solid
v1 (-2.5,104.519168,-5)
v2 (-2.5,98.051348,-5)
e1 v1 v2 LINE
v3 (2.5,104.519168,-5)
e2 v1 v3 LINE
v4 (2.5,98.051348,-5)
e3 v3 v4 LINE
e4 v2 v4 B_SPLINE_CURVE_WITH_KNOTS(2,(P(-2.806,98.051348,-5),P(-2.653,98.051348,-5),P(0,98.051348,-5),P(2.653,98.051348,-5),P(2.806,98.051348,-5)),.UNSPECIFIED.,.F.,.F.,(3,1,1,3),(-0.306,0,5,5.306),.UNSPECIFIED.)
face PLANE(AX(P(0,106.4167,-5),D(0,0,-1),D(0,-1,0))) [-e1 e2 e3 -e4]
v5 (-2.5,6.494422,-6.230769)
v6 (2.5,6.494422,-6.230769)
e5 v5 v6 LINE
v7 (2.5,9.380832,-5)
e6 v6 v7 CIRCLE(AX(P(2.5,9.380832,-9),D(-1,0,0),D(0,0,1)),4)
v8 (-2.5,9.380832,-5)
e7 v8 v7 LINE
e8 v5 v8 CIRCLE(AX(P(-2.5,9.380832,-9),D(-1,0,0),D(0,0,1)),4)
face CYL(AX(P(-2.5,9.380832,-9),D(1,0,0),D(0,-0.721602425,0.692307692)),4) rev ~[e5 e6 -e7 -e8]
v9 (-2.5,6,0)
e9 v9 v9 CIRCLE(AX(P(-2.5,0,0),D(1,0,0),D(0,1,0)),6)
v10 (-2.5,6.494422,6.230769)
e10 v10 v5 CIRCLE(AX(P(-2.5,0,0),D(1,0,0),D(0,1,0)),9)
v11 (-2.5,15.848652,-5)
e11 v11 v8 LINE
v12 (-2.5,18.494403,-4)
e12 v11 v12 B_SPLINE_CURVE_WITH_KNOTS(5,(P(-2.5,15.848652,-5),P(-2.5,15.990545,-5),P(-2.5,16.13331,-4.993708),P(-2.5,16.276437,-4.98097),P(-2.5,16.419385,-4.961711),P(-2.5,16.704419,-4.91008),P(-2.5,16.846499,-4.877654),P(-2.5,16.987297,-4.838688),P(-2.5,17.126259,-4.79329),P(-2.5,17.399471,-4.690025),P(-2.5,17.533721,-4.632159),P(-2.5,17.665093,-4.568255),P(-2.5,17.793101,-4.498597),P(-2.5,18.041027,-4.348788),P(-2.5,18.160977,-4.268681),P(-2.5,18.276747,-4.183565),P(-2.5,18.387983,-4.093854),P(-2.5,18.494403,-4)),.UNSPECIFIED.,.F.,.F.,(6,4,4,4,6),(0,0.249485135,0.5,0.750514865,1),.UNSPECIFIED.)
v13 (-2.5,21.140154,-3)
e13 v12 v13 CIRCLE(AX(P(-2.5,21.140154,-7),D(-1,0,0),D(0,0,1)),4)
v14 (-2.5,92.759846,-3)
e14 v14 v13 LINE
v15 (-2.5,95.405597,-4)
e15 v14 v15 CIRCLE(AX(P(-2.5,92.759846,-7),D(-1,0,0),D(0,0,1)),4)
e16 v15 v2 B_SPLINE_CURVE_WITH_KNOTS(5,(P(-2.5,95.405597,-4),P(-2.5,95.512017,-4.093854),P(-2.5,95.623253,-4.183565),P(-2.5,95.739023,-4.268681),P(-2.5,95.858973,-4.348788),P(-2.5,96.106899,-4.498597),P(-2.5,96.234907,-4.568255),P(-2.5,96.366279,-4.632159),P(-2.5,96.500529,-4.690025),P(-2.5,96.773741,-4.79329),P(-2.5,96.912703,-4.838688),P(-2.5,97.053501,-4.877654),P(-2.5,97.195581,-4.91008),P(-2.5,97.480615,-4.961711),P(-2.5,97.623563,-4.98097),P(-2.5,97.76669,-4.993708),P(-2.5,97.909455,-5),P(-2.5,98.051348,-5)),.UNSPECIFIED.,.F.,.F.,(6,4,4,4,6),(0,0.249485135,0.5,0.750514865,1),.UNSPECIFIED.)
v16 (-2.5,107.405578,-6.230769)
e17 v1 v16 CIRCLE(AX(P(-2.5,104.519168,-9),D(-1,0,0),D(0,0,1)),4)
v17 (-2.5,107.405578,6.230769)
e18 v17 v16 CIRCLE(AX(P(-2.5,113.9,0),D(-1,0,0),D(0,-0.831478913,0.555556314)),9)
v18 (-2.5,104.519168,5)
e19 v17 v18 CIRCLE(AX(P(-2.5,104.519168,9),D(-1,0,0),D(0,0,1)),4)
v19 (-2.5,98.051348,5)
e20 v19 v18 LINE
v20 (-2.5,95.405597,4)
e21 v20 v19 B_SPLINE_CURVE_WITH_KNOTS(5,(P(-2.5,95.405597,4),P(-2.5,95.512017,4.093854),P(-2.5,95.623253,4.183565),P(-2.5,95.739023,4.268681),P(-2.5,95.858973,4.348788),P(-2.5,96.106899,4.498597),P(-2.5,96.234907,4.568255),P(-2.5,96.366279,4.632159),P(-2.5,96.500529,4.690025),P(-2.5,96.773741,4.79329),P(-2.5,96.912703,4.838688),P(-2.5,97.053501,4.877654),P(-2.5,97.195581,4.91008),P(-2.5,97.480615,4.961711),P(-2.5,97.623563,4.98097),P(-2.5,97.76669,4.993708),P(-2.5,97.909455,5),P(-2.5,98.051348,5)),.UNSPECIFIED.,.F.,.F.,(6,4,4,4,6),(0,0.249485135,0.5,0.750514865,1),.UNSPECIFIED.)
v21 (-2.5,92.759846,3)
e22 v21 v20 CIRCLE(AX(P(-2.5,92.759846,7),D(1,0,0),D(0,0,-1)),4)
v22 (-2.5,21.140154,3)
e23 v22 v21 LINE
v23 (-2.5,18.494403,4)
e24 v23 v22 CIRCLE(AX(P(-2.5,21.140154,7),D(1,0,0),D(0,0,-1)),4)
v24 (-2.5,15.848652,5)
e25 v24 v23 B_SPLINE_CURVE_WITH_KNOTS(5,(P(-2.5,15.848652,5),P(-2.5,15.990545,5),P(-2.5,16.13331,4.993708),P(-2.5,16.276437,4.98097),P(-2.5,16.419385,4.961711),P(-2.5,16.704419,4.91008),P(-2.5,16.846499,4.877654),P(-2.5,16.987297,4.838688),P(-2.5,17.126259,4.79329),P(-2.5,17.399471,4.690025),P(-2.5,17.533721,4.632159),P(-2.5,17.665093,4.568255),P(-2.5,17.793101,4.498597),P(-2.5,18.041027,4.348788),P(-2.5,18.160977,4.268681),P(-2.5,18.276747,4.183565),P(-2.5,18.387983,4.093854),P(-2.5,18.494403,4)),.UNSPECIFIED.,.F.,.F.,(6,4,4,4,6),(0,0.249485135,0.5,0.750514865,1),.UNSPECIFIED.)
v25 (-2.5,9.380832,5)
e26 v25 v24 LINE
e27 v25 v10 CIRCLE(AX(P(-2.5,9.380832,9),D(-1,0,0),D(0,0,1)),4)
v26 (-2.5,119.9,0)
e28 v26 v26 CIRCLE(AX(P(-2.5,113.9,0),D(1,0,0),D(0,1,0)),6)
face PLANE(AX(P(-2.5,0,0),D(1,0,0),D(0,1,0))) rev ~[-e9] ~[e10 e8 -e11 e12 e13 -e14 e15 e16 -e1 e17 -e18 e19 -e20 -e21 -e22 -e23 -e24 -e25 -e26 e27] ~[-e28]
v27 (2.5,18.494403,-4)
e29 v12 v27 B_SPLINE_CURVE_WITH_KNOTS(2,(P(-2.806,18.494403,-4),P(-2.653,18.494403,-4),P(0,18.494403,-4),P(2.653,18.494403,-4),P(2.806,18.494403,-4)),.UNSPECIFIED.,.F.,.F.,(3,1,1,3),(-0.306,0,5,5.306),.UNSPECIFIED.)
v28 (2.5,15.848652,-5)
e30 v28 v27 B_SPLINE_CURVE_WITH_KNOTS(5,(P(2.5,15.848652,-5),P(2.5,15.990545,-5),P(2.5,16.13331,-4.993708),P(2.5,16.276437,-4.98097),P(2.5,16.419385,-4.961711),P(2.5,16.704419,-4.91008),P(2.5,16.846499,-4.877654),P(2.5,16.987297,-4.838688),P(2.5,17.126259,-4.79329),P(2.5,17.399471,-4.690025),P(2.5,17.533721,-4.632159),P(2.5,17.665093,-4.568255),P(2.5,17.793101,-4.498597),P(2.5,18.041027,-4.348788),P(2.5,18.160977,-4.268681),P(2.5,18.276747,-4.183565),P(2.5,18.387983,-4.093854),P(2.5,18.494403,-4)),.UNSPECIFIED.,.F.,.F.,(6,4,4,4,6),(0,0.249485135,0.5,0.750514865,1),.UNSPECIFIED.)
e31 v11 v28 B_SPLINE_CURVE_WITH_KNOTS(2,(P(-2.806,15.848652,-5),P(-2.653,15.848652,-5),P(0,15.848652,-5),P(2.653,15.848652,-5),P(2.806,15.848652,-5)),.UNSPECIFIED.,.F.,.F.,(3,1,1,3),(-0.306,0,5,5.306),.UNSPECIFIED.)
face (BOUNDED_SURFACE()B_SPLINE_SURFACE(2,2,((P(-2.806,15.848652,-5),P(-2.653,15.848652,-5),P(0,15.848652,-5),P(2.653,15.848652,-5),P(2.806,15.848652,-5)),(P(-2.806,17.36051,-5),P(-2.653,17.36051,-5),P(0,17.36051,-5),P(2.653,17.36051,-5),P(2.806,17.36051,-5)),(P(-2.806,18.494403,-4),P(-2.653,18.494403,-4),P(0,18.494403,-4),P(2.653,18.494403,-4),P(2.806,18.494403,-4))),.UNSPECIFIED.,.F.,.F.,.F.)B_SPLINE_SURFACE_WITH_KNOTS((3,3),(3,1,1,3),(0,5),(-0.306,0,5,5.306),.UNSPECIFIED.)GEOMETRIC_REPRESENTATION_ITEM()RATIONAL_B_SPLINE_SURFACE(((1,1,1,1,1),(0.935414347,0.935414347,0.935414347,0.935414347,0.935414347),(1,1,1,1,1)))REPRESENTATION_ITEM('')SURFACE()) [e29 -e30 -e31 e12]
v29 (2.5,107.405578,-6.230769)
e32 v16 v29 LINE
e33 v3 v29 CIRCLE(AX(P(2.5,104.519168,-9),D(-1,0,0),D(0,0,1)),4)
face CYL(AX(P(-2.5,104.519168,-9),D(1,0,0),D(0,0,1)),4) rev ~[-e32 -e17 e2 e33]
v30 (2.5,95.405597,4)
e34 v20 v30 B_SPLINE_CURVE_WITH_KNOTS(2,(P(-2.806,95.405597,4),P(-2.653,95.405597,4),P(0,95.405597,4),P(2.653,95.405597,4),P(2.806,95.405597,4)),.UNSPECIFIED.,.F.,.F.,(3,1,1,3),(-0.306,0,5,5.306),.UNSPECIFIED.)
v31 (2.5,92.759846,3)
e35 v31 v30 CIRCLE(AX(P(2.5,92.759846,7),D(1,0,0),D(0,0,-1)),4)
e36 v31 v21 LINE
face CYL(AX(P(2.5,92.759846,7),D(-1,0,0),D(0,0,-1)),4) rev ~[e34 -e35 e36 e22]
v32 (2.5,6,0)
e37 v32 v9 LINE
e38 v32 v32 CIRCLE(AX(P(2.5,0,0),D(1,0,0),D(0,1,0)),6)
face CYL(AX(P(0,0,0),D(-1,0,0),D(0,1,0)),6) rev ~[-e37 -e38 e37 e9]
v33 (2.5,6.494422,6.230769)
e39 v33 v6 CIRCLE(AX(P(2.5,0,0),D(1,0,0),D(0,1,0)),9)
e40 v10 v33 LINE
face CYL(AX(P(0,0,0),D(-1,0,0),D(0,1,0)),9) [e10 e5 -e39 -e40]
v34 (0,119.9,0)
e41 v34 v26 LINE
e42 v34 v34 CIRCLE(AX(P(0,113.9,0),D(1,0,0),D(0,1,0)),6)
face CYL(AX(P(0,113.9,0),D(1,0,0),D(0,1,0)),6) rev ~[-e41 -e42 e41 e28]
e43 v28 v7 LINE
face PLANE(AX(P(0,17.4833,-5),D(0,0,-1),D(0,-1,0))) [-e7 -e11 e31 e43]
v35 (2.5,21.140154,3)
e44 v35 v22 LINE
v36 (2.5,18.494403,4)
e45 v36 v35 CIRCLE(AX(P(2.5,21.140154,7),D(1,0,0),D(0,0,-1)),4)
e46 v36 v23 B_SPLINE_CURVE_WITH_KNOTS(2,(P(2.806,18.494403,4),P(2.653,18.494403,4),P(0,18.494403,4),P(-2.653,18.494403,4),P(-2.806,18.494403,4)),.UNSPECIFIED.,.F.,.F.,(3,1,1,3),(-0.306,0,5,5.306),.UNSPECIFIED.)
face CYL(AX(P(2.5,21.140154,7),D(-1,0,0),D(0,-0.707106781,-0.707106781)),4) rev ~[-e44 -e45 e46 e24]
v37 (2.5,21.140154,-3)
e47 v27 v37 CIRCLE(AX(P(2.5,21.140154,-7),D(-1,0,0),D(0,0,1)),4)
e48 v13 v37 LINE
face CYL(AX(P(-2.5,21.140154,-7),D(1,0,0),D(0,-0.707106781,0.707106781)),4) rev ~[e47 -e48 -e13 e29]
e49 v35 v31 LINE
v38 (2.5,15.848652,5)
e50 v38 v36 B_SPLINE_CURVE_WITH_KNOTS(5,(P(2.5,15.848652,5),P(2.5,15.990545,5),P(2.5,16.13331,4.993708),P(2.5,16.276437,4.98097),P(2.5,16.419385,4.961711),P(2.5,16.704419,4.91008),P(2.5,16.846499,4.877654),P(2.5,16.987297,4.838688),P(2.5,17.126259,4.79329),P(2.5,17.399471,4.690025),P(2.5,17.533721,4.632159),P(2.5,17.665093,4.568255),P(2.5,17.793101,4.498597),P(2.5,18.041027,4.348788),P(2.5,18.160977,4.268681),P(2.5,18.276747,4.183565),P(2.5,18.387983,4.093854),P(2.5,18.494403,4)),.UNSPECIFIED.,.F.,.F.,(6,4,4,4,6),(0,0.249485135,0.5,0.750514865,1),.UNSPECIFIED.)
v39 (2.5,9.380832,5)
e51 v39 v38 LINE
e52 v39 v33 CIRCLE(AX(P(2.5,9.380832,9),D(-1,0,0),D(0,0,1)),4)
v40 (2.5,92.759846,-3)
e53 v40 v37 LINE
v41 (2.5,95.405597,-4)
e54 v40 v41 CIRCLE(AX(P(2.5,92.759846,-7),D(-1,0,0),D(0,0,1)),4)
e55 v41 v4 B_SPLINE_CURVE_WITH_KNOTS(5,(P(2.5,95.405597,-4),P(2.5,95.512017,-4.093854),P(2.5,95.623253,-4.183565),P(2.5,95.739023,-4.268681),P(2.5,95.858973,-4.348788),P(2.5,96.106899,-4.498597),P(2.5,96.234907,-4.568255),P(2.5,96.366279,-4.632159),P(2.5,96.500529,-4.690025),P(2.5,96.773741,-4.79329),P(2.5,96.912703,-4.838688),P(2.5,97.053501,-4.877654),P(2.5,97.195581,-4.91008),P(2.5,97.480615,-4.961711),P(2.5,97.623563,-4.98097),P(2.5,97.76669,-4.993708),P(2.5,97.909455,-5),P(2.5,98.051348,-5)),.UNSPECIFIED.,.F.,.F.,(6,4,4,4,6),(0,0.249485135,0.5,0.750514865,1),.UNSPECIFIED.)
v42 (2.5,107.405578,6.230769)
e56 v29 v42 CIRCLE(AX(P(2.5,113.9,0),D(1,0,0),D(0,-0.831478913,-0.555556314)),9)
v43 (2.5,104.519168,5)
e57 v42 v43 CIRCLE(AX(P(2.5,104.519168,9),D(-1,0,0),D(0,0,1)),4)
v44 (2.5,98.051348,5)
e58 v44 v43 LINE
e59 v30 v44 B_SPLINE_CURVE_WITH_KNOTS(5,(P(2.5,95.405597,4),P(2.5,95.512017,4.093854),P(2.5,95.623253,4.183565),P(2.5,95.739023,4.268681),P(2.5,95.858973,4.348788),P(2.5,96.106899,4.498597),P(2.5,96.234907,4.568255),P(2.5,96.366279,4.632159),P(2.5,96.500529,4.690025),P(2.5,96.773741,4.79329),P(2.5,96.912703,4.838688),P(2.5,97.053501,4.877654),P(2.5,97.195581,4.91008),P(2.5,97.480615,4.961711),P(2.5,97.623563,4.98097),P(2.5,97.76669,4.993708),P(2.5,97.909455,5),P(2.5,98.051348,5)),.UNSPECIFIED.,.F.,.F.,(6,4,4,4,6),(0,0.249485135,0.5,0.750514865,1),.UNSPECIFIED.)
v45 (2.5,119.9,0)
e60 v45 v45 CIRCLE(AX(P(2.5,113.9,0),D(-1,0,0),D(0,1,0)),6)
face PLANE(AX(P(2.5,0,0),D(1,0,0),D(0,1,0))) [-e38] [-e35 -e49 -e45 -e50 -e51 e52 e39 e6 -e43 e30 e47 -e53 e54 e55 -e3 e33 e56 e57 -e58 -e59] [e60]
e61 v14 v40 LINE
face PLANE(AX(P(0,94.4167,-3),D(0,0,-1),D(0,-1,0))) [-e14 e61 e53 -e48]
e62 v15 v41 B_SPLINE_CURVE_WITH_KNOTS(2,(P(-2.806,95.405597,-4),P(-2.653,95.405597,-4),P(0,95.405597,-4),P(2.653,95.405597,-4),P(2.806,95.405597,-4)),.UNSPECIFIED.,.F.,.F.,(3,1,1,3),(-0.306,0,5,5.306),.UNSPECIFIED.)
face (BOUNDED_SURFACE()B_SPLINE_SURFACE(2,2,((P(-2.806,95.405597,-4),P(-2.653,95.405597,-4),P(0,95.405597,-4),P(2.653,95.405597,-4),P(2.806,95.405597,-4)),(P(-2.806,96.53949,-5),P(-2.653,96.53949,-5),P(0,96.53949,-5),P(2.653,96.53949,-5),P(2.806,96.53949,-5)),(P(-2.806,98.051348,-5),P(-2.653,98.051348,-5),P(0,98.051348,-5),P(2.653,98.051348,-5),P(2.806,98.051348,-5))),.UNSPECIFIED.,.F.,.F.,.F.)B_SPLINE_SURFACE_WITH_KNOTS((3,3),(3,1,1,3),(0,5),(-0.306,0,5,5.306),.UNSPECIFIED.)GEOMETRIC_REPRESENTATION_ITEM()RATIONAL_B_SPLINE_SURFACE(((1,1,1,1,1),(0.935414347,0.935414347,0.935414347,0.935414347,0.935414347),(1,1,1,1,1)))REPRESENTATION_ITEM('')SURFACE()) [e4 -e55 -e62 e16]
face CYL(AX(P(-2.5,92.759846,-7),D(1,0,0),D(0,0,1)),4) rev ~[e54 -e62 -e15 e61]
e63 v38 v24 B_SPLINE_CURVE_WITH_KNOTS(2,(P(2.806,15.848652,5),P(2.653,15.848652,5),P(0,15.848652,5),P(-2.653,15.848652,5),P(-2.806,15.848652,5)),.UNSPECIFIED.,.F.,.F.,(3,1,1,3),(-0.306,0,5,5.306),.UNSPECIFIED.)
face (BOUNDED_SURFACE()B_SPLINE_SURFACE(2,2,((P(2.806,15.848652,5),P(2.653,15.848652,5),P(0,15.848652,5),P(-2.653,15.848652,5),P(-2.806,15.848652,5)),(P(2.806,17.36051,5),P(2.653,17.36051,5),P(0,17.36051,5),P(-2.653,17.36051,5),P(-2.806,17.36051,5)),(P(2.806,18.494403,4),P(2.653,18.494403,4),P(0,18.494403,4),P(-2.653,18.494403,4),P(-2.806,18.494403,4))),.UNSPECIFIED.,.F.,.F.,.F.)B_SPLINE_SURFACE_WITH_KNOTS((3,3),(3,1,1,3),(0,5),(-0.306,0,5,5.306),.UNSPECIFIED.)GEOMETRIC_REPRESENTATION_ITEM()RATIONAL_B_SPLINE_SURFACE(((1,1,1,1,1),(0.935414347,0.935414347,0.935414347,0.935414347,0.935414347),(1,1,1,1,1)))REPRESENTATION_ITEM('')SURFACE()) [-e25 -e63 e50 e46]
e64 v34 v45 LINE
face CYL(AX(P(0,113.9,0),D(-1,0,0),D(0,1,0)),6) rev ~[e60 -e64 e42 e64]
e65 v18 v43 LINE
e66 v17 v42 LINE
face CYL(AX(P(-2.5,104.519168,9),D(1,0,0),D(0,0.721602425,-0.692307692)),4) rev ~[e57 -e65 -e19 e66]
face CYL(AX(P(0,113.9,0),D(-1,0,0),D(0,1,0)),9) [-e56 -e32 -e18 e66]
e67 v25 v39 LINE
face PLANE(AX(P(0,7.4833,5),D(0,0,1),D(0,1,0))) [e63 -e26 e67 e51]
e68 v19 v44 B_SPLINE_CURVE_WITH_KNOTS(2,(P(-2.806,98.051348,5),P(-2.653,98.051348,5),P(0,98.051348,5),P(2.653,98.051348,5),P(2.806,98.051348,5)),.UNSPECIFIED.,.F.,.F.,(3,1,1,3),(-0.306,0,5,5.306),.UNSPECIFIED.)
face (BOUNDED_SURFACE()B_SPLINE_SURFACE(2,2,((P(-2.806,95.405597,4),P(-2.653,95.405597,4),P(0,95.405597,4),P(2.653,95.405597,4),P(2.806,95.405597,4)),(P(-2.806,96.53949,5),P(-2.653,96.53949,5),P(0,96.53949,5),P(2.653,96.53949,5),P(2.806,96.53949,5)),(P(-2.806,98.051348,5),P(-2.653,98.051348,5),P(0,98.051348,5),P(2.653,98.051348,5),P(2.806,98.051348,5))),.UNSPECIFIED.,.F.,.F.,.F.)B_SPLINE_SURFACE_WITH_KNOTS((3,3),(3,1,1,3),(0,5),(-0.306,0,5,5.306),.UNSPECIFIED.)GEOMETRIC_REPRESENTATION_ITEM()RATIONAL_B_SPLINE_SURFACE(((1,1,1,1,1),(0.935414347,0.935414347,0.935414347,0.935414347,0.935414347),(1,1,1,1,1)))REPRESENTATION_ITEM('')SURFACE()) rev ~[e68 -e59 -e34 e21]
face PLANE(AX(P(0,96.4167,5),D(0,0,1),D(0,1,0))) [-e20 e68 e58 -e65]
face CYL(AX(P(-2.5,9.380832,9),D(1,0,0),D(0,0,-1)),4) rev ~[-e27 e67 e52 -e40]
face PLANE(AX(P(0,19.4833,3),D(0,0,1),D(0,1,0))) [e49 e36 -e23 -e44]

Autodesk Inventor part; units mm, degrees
ref_plane "YZ Plane" through (0, 0, 0) normal (1, 0, 0) x (0, 1, 0)
ref_plane "XZ Plane" through (0, 0, 0) normal (0, 1, 0) x (-1, 0, 0)
ref_plane "XY Plane" through (0, 0, 0) normal (0, 0, 1) x (1, 0, 0)
sketch "草圖1" plane through (0, 0, 0) normal (1, 0, 0) x (0, 1, 0)
  line L0 (0, 0) -> (113.9, 0)
  circle A0 centre (113.9, 0) radius 6
  circle A1 centre (0, 0) radius 6
  circle A2 centre (0, 0) radius 9
  circle A3 centre (113.9, 0) radius 9
  line L1 (7.4833, 5) -> (17.4833, 5)
  line L2 (17.4833, 5) -> (19.4833, 3)
  line L3 (19.4833, 3) -> (94.4167, 3)
  line L4 (94.4167, 3) -> (96.4167, 5)
  line L5 (96.4167, 5) -> (106.4167, 5)
  line L6 (106.4167, -5) -> (96.4167, -5)
  line L7 (96.4167, -5) -> (94.4167, -3)
  line L8 (94.4167, -3) -> (19.4833, -3)
  line L9 (19.4833, -3) -> (17.4833, -5)
  line L10 (17.4833, -5) -> (7.4833, -5)
  dimension "d0" = 113.9
  dimension "d1" = 12
  dimension "d2" = 12
  dimension "d3" = 18
  dimension "d4" = 18
  dimension "d5" = 3
  dimension "d6" = 5
  dimension "d7" = 10
  dimension "d8" = 10
extrude "擠出1" add sketch "草圖1" along normal mid plane 5
fillet "圓角1" radius 4 12 edges at (0, 106.4167, 5) (0, 96.4167, 5) (0, 94.4167, 3) (0, 17.4833, 5) (0, 7.4833, 5) (0, 19.4833, 3) (0, 7.4833, -5) (0, 17.4833, -5) (0, 19.4833, -3) (0, 106.4167, -5) (0, 96.4167, -5) (0, 94.4167, -3)
equation "\"d2\" = d1"
equation "\"d3\" = d4"
equation "\"d8\" = d7"
properties part number "Link_DE" material "ABS 塑膠"
